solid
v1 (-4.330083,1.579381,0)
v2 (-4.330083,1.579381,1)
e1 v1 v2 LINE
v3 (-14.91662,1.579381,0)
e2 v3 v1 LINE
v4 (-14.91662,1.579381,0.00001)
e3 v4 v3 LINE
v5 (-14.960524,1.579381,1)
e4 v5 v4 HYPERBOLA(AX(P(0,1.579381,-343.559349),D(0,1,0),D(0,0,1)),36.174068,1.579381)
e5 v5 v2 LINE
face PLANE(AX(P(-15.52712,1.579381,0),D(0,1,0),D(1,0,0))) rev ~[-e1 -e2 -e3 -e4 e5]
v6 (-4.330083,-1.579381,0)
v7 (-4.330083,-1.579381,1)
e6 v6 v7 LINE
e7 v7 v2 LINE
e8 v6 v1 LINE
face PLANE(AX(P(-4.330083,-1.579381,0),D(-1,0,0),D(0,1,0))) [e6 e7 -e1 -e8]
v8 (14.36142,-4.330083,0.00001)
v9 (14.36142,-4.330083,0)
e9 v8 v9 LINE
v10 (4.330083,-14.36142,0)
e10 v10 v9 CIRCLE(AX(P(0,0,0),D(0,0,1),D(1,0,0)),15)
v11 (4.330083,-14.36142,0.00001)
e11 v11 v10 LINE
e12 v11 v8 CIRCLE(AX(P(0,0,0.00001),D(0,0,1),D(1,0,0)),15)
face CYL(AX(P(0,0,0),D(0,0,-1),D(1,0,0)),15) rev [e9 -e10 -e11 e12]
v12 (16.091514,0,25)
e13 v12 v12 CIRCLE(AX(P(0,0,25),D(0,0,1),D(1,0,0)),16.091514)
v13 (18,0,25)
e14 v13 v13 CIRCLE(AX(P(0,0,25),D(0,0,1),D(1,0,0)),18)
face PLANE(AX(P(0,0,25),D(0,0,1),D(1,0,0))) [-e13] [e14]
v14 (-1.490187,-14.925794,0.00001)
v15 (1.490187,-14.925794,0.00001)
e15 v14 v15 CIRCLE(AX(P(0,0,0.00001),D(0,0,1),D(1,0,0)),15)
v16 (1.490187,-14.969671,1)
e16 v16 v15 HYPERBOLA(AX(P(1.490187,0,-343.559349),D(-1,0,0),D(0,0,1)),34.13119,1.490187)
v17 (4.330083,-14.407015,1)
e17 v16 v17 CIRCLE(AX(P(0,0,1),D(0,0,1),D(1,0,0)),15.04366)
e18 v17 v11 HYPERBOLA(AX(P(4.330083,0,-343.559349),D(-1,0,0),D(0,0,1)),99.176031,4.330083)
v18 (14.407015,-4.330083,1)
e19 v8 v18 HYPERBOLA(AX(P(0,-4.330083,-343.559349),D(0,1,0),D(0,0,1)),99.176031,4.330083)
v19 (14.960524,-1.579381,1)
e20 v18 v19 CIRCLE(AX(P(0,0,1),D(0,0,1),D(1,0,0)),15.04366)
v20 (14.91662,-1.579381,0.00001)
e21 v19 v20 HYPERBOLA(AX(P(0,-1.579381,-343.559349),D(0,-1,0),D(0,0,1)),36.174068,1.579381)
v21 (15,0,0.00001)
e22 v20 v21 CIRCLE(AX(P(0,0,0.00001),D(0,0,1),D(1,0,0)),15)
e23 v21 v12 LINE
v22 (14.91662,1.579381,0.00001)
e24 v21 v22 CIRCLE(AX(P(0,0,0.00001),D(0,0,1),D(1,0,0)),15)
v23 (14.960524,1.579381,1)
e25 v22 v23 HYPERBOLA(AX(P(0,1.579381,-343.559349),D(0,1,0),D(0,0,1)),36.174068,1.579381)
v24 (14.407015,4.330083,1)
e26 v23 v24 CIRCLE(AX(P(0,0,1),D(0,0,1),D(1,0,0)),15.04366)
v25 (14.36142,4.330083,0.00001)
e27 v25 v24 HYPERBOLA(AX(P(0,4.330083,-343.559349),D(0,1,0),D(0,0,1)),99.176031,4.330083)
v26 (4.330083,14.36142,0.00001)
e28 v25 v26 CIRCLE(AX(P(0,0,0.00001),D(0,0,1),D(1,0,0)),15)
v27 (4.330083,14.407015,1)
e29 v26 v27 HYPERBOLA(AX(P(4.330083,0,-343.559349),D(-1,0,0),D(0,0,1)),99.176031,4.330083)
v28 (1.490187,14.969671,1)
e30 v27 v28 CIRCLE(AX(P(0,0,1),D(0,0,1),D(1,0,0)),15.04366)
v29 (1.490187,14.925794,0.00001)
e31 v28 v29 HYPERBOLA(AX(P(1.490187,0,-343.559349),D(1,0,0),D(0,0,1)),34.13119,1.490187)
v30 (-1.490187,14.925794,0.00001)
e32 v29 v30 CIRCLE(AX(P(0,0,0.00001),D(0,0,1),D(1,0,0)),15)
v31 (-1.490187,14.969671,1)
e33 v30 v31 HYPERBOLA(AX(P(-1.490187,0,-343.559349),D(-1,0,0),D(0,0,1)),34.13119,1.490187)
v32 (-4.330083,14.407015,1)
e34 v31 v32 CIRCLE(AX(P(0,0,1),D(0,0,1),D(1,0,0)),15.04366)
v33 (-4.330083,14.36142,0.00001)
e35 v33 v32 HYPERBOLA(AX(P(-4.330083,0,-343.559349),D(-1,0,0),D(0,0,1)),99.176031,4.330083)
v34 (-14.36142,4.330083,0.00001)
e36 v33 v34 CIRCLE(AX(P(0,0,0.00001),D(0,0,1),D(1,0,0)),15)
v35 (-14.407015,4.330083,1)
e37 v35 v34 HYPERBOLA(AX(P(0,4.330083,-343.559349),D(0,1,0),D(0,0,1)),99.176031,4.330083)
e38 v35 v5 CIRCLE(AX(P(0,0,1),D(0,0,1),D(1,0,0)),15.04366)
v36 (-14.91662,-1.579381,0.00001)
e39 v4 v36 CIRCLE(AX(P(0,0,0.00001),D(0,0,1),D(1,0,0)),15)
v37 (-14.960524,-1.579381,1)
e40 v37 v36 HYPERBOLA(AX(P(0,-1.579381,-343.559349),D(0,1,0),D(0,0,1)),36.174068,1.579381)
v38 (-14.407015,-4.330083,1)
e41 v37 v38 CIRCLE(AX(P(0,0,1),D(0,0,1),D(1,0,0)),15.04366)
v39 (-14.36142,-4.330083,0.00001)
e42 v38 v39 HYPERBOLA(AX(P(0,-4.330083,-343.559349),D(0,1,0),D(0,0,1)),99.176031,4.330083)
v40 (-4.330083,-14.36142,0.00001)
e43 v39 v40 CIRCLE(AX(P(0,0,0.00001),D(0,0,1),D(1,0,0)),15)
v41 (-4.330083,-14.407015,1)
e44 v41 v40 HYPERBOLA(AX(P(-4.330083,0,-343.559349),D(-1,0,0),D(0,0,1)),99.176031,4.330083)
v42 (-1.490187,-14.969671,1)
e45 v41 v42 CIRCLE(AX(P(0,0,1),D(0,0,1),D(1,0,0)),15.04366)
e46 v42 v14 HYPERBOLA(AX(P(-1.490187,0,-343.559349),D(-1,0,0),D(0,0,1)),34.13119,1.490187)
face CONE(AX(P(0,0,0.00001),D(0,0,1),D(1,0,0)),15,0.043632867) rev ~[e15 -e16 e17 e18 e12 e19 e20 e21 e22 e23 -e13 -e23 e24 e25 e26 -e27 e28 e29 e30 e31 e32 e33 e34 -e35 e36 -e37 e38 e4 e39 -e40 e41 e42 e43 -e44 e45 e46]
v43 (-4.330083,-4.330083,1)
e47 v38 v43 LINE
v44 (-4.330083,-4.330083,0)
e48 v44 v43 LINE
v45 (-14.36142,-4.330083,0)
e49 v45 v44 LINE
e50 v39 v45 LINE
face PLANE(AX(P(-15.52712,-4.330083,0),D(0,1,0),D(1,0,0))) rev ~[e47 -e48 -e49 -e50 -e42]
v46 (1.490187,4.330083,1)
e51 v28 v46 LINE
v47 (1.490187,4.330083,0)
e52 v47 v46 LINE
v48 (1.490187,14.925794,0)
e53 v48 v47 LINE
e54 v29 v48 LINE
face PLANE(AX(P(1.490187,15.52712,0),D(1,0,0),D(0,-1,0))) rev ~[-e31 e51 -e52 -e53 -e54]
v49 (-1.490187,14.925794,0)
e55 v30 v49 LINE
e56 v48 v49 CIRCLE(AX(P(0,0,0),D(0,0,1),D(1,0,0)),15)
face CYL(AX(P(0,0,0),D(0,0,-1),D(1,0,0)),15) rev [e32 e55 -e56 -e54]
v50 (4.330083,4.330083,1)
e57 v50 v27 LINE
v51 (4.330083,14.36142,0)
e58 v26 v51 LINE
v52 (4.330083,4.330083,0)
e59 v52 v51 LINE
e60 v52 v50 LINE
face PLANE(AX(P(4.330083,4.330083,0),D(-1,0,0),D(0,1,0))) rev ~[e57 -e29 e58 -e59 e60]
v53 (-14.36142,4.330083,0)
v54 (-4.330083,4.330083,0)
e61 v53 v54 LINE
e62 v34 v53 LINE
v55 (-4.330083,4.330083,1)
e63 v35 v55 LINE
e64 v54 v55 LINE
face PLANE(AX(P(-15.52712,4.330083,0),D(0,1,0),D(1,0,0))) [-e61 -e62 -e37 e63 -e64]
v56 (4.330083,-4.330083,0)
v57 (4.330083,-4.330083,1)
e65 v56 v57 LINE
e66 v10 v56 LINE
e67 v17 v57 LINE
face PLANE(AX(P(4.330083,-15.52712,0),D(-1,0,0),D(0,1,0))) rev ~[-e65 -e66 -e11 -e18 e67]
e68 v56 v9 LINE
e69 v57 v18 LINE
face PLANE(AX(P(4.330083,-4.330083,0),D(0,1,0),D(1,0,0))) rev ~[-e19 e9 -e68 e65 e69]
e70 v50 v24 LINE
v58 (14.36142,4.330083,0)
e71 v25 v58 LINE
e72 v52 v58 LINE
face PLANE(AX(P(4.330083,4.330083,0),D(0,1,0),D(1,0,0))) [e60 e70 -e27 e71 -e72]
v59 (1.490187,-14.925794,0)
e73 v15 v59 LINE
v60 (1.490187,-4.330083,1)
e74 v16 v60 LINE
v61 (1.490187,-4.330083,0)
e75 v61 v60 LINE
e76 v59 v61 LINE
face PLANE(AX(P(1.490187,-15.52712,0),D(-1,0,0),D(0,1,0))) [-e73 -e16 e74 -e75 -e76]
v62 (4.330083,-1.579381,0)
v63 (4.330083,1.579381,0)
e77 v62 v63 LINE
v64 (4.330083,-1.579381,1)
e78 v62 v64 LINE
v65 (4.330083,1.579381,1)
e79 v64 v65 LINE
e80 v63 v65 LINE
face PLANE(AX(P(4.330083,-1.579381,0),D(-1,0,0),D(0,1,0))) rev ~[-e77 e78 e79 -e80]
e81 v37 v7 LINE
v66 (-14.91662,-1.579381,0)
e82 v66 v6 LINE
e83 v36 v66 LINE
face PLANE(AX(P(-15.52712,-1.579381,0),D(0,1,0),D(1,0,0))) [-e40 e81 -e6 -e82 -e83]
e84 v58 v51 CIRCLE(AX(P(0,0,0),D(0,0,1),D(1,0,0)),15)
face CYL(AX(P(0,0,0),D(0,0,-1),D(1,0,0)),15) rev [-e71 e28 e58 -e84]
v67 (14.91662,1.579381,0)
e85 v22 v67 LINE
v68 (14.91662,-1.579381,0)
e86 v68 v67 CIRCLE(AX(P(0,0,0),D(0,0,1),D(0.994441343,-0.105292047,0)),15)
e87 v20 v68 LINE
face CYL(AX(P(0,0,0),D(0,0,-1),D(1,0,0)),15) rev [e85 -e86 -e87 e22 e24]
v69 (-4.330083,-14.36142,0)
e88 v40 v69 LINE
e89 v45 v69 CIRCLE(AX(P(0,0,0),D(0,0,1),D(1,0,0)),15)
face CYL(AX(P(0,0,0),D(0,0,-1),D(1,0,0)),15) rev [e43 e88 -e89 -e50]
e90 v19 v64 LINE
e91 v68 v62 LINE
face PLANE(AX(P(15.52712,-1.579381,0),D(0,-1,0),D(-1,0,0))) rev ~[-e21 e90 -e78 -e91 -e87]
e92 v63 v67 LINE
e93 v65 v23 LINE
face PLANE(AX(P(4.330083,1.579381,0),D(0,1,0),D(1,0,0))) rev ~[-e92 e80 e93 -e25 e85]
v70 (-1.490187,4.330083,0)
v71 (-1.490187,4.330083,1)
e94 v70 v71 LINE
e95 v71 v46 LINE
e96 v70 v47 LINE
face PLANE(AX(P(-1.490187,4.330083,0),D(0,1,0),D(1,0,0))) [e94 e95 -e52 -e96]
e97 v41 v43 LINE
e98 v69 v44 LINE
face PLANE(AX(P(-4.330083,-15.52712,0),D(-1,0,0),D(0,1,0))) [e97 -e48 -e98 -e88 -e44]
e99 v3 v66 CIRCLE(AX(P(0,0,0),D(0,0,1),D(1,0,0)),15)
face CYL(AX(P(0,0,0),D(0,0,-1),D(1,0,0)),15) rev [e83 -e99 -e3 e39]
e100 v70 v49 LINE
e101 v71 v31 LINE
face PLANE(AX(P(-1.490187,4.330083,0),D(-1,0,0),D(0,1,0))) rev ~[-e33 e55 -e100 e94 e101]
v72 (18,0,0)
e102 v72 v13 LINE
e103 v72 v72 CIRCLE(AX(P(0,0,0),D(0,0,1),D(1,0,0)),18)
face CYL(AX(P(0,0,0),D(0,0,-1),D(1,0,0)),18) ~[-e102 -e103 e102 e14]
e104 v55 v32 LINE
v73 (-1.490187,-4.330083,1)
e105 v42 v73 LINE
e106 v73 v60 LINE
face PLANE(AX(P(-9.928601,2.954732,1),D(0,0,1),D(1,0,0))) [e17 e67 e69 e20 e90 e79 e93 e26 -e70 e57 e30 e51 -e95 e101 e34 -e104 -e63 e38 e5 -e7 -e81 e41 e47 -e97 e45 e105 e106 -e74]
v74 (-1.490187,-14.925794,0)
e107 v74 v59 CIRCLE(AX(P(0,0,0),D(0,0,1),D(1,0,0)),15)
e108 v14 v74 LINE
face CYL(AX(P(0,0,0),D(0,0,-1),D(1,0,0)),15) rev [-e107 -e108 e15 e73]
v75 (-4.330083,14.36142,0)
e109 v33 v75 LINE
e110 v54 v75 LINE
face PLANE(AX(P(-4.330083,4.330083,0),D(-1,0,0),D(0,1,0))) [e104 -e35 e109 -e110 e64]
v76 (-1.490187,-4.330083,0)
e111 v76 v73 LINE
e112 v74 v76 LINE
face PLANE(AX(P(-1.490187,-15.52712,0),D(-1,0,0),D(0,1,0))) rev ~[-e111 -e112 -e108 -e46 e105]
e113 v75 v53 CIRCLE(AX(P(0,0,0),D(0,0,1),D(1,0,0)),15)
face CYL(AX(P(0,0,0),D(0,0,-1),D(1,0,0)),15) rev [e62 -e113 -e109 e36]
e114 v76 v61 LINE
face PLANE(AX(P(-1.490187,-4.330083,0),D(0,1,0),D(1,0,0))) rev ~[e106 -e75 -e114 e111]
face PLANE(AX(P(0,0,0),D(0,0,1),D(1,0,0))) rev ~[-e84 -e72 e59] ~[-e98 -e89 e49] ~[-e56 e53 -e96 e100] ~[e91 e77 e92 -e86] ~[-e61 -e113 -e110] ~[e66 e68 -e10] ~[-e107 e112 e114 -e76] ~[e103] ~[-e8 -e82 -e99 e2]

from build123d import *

# Parameters (mm, degrees)
F0_R     = 18
F0_R_2   = 15
F1_DEPTH = 25
F2_SIZE2 = 1.091514
F2_SIZE  = 24.99999
F3_W     = 11.1970370635
F3_H     = 2.7507020859
F3_W_2   = 2.8398953145
F3_H_2   = 11.1970370635
F3_H_3   = 3.1587614212
F3_W_3   = 2.980374964
F4_DEPTH = 1


# Not quite as in the source:
# - a fillet or chamfer is up to 0.001 mm smaller than in the source, because OpenCascade refuses the exact size


with BuildPart() as f1:
    # F0 (on Top) → F1 (new body)
    with BuildSketch(Plane.XY):
        Circle(F0_R)
        Circle(F0_R_2, mode=Mode.SUBTRACT)
    extrude(amount=F1_DEPTH)

    # F2 (size 25 and 1.0915235727 in the source; OpenCascade refuses exactly that, so slightly less here)
    f2_edges = [f1.edges().sort_by_distance(p)[0] for p in [
        (-15, 0, 25),
    ]]
    f2_side = f1.faces().sort_by_distance((-15, 0, 12.5))[0]
    chamfer(f2_edges, length=F2_SIZE, length2=F2_SIZE2, reference=f2_side)

    # F3 (on Top) → F4 (join)
    with BuildSketch(Plane.XY):
        with Locations((-9.9286013283, 2.9547317536)):
            Rectangle(F3_W, F3_H)
        with Locations((-9.9286013283, -2.9547317536)):
            Rectangle(F3_W, F3_H)
        with Locations((2.9101351392, 9.9286013283)):
            Rectangle(F3_W_2, F3_H_2)
        with Locations((-2.9101351392, 9.9286013283)):
            Rectangle(F3_W_2, F3_H_2)
        with Locations((9.9286013283, 2.9547317536)):
            Rectangle(F3_W, F3_H)
        with Locations((9.9286013283, -2.9547317536)):
            Rectangle(F3_W, F3_H)
        with Locations((2.9101351392, -9.9286013283)):
            Rectangle(F3_W_2, F3_H_2)
        with Locations((-2.9101351392, -9.9286013283)):
            Rectangle(F3_W_2, F3_H_2)
        with Locations((2.9101351392, 2.9547317536)):
            Rectangle(F3_W_2, F3_H)
        with Locations((-2.9101351392, 2.9547317536)):
            Rectangle(F3_W_2, F3_H)
        with Locations((-2.9101351392, 0)):
            Rectangle(F3_W_2, F3_H_3)
        with Locations((-2.9101351392, -2.9547317536)):
            Rectangle(F3_W_2, F3_H)
        with Locations((0, -2.9547317536)):
            Rectangle(F3_W_3, F3_H)
        with Locations((2.9101351392, -2.9547317536)):
            Rectangle(F3_W_2, F3_H)
        with Locations((2.9101351392, 0)):
            Rectangle(F3_W_2, F3_H_3)
        with Locations((0, 2.9547317536)):
            Rectangle(F3_W_3, F3_H)
        Rectangle(F3_W_3, F3_H_3)
    extrude(amount=F4_DEPTH)


solid = f1.part
